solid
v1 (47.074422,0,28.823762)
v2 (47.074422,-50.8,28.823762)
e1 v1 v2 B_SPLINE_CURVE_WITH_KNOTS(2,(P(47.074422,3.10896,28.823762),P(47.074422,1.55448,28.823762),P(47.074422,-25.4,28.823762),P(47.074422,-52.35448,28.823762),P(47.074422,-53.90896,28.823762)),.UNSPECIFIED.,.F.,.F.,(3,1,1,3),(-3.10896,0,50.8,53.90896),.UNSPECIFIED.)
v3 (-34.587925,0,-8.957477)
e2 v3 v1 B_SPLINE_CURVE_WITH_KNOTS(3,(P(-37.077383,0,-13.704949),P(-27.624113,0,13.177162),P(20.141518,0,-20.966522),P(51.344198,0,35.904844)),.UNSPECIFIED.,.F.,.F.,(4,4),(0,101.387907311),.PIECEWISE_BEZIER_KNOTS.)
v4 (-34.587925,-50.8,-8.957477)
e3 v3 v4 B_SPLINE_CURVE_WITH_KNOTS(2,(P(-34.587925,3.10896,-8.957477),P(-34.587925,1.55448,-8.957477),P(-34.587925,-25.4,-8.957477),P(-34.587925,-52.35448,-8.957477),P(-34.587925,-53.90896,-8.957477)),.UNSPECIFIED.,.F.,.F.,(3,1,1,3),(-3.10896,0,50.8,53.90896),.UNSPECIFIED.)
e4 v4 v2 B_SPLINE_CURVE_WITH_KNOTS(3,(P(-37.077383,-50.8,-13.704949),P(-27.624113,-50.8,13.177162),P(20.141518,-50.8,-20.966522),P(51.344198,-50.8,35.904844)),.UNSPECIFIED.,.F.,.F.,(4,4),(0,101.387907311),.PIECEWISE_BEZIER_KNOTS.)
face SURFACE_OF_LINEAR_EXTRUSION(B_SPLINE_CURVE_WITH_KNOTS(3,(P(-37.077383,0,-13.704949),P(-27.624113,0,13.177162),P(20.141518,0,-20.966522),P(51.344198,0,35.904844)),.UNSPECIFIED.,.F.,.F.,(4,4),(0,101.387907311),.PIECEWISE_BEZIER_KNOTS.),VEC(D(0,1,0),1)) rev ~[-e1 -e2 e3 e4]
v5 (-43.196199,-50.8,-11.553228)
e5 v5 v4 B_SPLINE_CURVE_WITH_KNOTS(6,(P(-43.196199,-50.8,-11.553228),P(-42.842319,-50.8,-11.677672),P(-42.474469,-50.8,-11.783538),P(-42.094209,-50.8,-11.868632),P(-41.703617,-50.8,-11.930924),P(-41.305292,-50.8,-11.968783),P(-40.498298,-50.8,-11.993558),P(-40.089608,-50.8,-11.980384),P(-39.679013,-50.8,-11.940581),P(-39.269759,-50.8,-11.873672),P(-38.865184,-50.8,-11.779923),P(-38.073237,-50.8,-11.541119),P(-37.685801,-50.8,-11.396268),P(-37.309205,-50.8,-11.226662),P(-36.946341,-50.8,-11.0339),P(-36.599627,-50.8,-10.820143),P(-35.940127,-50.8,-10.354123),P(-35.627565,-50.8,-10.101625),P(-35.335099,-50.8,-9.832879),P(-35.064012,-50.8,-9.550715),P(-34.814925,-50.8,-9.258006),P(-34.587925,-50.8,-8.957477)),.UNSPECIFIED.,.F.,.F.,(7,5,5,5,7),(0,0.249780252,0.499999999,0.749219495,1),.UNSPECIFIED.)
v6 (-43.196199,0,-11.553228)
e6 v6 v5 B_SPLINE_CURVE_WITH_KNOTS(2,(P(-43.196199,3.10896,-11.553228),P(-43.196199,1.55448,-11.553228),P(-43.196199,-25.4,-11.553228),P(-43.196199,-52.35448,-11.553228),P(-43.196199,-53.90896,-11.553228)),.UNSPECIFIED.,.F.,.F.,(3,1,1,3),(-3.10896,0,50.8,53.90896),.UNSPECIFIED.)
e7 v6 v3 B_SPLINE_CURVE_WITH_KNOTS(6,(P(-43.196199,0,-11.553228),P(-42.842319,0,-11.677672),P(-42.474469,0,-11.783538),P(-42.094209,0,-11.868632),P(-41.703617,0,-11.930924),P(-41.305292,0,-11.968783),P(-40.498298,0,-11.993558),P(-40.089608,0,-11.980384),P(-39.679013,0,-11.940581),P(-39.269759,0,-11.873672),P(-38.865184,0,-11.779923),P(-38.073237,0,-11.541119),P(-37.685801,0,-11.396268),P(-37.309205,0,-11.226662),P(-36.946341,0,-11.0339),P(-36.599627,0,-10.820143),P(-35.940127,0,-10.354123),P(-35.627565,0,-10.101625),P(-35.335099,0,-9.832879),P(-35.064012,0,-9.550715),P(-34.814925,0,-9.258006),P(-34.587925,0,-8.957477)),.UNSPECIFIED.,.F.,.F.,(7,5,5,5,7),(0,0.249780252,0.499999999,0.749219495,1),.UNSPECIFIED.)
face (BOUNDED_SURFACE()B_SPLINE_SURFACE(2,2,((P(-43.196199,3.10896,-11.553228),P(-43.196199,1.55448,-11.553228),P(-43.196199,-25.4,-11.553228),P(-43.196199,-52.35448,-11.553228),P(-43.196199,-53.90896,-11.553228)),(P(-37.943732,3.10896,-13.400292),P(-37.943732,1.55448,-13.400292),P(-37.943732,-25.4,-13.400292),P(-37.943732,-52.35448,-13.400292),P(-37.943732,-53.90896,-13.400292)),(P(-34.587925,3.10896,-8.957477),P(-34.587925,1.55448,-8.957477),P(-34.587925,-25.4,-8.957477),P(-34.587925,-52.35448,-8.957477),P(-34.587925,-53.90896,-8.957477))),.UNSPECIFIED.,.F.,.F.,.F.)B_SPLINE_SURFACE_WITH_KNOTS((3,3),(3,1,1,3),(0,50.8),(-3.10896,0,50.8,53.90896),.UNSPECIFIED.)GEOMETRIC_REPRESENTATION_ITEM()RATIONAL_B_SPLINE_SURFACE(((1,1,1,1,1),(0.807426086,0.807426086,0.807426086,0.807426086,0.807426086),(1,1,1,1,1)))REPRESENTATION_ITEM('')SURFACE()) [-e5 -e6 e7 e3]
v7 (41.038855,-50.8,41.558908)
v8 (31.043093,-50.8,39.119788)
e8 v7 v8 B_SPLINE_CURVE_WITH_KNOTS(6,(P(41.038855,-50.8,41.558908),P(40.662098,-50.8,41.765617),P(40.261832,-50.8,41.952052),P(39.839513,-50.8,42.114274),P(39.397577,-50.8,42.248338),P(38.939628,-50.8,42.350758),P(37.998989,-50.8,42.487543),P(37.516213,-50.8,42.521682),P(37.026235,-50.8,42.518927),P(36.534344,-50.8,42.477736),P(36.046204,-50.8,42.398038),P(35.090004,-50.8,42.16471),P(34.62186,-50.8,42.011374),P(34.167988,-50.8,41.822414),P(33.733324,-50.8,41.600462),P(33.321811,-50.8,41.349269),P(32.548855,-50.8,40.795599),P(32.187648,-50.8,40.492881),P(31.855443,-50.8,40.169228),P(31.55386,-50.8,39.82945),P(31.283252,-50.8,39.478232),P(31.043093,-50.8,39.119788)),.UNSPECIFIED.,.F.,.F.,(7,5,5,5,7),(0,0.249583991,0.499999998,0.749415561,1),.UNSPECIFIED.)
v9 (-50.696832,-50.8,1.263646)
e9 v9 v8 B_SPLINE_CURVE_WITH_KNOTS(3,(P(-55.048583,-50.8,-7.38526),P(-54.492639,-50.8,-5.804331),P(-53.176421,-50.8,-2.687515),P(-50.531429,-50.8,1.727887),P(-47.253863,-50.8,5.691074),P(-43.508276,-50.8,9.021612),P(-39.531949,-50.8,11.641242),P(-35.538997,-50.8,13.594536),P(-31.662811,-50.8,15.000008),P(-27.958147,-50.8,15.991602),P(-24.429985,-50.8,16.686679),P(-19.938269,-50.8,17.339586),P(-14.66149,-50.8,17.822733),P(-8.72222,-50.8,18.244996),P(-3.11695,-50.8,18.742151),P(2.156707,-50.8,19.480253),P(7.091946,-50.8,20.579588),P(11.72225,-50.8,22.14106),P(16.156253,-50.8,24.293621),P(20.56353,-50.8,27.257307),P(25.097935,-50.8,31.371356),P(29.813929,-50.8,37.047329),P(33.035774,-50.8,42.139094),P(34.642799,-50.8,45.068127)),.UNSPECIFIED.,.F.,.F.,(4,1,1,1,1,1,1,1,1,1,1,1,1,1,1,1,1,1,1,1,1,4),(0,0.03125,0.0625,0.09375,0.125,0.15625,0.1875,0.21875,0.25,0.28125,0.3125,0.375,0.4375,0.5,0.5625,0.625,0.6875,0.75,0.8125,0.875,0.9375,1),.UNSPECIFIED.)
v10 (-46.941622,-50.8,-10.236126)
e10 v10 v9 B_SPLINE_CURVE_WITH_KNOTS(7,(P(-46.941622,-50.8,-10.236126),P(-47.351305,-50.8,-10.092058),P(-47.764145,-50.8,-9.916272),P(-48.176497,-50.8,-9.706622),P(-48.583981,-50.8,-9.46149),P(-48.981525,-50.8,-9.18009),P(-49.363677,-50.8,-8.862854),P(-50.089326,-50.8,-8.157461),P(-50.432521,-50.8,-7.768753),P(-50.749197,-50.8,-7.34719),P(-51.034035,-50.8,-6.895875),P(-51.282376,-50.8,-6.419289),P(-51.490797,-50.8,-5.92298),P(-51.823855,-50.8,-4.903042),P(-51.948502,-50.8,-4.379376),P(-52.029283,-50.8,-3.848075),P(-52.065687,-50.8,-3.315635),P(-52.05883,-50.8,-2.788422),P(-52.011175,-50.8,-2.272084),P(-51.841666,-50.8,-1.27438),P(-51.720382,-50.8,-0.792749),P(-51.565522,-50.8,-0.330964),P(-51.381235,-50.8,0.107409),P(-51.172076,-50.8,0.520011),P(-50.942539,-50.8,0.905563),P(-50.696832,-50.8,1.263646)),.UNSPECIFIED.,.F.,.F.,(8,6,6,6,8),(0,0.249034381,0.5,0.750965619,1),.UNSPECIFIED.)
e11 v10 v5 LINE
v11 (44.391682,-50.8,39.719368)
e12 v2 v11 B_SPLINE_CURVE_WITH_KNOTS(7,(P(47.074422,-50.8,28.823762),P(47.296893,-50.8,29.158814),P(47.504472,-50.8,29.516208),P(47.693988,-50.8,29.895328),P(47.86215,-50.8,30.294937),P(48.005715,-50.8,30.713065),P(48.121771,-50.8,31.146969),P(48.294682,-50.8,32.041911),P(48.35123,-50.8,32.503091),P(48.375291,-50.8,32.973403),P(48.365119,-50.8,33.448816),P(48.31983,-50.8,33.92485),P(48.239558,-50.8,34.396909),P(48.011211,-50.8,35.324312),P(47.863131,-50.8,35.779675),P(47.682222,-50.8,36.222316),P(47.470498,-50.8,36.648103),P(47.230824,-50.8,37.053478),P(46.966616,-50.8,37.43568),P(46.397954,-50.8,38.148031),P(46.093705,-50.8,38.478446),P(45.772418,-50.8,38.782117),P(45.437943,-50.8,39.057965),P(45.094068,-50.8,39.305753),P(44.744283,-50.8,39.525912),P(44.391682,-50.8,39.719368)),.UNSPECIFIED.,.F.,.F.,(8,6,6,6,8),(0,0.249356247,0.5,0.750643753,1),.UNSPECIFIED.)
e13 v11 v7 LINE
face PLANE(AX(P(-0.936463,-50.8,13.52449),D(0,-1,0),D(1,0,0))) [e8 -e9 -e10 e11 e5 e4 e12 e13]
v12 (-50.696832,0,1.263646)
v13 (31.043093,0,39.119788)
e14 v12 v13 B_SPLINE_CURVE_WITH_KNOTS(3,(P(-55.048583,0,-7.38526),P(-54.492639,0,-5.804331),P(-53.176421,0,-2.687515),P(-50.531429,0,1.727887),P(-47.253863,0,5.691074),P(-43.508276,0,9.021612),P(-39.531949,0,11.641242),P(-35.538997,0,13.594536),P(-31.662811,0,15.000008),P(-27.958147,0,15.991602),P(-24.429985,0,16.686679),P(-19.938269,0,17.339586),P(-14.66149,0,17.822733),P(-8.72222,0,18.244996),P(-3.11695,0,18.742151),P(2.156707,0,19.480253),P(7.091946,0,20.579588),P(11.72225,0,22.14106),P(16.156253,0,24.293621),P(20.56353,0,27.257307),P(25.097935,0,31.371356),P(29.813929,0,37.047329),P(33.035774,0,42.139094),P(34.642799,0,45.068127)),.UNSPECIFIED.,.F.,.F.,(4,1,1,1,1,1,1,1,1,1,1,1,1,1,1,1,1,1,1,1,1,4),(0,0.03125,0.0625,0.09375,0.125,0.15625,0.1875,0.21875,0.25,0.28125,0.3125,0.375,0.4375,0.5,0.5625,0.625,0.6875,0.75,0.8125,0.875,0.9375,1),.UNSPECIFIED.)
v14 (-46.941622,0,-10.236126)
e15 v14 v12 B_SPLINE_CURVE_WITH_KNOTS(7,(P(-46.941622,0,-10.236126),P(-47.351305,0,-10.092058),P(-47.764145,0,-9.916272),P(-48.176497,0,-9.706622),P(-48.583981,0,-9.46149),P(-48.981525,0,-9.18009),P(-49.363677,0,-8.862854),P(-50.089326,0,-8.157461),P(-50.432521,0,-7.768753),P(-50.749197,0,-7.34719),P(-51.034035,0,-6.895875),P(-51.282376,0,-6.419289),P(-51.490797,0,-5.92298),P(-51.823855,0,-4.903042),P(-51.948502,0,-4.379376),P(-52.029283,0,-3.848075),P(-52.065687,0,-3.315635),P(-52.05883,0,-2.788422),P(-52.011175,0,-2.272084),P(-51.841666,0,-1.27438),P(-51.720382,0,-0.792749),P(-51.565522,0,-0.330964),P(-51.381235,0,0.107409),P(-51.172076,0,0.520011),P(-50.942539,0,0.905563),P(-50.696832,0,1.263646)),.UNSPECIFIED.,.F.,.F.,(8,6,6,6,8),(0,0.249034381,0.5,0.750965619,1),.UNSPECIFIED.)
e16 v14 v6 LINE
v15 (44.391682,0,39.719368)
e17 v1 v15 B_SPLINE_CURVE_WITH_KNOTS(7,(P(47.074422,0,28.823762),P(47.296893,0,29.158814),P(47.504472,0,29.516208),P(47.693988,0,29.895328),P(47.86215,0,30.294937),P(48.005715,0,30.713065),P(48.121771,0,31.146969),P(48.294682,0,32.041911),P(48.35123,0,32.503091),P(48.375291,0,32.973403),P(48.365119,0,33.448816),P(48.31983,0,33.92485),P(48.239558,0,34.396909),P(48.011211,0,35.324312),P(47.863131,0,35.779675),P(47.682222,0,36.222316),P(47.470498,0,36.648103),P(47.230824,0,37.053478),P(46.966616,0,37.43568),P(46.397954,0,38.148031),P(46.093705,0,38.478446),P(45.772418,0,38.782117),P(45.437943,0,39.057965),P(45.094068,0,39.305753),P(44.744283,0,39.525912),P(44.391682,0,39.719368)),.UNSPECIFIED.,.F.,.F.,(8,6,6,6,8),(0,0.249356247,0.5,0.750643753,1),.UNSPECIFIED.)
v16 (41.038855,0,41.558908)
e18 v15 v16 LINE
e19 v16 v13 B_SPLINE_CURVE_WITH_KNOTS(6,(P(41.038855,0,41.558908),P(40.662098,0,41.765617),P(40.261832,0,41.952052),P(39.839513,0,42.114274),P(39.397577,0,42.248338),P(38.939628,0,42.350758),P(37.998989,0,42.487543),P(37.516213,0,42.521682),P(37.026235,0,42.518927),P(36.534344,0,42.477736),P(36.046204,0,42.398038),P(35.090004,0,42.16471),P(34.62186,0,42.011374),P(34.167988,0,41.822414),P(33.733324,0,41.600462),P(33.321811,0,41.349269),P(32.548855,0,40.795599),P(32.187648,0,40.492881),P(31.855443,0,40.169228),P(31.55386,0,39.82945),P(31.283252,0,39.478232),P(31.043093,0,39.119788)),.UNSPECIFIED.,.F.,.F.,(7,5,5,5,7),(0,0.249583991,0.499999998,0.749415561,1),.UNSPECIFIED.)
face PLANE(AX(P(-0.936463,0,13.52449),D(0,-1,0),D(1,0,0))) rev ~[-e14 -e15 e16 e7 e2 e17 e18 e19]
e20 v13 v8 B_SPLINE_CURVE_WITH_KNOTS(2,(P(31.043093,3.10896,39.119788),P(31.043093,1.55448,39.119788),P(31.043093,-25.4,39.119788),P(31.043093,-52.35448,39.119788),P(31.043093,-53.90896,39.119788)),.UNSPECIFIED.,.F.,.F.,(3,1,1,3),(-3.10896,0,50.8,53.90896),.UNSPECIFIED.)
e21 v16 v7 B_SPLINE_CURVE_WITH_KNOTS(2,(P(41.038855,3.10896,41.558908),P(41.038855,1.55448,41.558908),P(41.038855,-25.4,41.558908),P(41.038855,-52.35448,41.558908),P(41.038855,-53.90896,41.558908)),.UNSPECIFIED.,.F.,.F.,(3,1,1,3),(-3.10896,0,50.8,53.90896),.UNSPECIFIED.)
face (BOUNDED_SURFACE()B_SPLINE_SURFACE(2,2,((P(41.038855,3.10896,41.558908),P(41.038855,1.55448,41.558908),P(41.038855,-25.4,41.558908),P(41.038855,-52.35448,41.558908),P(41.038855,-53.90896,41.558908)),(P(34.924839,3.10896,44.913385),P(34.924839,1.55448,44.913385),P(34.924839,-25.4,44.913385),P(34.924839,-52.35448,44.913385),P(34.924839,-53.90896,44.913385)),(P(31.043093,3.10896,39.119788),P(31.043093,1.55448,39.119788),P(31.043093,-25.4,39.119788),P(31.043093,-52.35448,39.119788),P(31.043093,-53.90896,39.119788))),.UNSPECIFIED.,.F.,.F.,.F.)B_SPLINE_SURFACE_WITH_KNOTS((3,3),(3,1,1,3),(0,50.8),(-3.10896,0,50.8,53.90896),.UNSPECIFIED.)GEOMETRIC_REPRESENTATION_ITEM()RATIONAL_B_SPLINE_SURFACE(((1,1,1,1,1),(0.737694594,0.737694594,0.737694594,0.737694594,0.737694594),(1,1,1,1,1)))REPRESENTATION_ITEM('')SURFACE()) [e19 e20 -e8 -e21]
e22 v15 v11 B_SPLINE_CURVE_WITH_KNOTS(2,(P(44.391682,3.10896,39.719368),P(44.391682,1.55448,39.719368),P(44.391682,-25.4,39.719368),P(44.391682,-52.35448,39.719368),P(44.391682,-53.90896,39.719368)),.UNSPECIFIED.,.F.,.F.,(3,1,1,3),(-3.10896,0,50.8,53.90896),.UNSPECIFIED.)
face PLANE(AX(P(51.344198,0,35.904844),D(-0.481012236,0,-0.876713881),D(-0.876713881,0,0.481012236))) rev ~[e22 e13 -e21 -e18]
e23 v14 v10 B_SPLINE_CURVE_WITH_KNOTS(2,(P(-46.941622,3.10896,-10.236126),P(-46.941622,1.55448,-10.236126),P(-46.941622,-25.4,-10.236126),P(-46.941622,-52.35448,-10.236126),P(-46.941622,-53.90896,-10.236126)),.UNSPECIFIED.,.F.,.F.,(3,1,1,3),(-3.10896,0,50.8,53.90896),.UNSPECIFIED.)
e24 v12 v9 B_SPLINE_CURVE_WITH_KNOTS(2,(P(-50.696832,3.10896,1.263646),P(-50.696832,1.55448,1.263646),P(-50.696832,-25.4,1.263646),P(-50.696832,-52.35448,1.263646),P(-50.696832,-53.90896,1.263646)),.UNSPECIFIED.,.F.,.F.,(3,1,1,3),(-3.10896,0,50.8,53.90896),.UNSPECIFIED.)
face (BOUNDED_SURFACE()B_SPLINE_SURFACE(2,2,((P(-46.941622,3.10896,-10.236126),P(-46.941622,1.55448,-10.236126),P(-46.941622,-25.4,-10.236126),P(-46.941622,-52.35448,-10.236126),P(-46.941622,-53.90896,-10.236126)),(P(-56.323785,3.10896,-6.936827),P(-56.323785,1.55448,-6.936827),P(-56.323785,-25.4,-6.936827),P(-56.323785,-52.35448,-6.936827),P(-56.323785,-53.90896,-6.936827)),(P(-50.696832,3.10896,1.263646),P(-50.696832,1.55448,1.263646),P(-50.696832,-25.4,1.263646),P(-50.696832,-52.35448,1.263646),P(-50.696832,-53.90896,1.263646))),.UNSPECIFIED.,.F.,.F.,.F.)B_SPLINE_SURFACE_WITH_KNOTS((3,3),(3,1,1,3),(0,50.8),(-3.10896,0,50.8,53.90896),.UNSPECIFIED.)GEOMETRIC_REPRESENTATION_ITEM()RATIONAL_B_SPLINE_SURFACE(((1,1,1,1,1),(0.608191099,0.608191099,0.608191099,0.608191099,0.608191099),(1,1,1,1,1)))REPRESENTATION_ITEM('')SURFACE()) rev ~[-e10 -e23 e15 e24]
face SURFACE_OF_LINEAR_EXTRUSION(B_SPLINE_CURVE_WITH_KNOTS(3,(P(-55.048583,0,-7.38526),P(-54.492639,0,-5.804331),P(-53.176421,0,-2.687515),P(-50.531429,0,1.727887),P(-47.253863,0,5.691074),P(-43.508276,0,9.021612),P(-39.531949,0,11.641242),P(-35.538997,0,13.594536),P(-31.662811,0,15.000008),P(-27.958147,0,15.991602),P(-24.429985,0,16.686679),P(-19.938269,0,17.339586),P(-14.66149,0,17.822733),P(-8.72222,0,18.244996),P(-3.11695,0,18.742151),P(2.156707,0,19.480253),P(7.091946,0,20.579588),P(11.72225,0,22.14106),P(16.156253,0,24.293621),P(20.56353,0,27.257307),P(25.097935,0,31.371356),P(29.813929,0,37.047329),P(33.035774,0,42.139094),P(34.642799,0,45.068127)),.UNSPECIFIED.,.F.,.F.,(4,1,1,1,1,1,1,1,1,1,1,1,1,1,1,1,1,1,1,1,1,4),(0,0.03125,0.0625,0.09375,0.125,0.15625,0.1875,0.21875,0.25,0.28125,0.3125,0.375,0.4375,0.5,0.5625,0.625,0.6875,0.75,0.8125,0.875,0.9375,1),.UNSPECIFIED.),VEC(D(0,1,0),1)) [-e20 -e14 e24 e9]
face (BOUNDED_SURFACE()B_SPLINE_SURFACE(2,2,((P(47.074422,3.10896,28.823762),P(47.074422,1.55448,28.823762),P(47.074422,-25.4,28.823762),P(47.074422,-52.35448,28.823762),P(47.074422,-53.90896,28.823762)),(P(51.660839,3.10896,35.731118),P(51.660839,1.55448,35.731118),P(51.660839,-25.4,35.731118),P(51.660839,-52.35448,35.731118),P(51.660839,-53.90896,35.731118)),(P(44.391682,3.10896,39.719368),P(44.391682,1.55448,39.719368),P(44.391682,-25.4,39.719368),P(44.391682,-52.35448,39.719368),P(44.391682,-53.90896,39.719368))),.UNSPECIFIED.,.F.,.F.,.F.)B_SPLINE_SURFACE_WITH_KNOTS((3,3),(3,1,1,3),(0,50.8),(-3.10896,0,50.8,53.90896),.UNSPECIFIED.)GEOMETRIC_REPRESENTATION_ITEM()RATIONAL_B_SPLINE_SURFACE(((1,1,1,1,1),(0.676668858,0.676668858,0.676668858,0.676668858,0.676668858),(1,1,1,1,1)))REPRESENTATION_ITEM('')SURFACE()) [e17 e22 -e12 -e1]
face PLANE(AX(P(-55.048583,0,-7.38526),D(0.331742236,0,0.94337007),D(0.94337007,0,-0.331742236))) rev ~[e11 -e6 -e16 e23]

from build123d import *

# Parameters (mm, degrees)
F1_DEPTH = 50.8
F2_R     = 7.62


# Not quite as in the source:
# - the dataset's text gives a spline's control points without its knots; the knots are read off the source's solid


with BuildPart() as f1:
    # F0 (on Front) → F1 (new body)
    with BuildSketch(Plane.XZ):
        with BuildLine():
            Line((-55.0485830889, -7.3852598701), (-37.0773832593, -13.7049494734))
            add(Edge.make_bspline(
                [(-37.0773832593, -13.7049494734), (-27.6241134369, 13.1771620994), (20.1415180746, -20.9665218169), (51.3441984318, 35.9048443187)],
                knots=[0, 0, 0, 0, 101.3879073107, 101.3879073107, 101.3879073107, 101.3879073107], degree=3))
            Line((51.3441984318, 35.9048443187), (34.642799002, 45.0681274141))
            add(Edge.make_bspline(
                [(-55.0485830889, -7.3852598701), (-54.4926390919, -5.8043308542), (-53.1764213729, -2.6875146015), (-50.5314293038, 1.7278867732), (-47.2538632861, 5.6910743545), (-43.5082758092, 9.0216121231), (-39.5319485188, 11.6412421502), (-35.5389972848, 13.5945362808), (-31.6628107822, 15.0000075173), (-27.9581465021, 15.9916019071), (-24.4299846836, 16.6866792977), (-19.9382693628, 17.339586267), (-14.6614899569, 17.8227328201), (-8.7222195676, 18.2449955114), (-3.1169497995, 18.7421505919), (2.1567072949, 19.480252644), (7.091946379, 20.579587662), (11.7222503062, 22.1410595224), (16.1562527032, 24.2936211212), (20.5635300178, 27.2573066834), (25.0979351909, 31.3713560869), (29.8139291199, 37.0473286244), (33.0357743953, 42.1390942751), (34.642799002, 45.0681274141)],
                knots=[0, 0, 0, 0, 0.03125, 0.0625, 0.09375, 0.125, 0.15625, 0.1875, 0.21875, 0.25, 0.28125, 0.3125, 0.375, 0.4375, 0.5, 0.5625, 0.625, 0.6875, 0.75, 0.8125, 0.875, 0.9375, 1, 1, 1, 1], degree=3))
        make_face()
    extrude(amount=F1_DEPTH)

    # F2
    f2_edges = [f1.edges().sort_by_distance(p)[0] for p in [
        (34.642799, -25.4, 45.068127),
        (51.344198, -25.4, 35.904844),
        (-55.048583, -25.4, -7.38526),
        (-37.077383, -25.4, -13.704949),
    ]]
    fillet(f2_edges, radius=F2_R)


solid = f1.part
